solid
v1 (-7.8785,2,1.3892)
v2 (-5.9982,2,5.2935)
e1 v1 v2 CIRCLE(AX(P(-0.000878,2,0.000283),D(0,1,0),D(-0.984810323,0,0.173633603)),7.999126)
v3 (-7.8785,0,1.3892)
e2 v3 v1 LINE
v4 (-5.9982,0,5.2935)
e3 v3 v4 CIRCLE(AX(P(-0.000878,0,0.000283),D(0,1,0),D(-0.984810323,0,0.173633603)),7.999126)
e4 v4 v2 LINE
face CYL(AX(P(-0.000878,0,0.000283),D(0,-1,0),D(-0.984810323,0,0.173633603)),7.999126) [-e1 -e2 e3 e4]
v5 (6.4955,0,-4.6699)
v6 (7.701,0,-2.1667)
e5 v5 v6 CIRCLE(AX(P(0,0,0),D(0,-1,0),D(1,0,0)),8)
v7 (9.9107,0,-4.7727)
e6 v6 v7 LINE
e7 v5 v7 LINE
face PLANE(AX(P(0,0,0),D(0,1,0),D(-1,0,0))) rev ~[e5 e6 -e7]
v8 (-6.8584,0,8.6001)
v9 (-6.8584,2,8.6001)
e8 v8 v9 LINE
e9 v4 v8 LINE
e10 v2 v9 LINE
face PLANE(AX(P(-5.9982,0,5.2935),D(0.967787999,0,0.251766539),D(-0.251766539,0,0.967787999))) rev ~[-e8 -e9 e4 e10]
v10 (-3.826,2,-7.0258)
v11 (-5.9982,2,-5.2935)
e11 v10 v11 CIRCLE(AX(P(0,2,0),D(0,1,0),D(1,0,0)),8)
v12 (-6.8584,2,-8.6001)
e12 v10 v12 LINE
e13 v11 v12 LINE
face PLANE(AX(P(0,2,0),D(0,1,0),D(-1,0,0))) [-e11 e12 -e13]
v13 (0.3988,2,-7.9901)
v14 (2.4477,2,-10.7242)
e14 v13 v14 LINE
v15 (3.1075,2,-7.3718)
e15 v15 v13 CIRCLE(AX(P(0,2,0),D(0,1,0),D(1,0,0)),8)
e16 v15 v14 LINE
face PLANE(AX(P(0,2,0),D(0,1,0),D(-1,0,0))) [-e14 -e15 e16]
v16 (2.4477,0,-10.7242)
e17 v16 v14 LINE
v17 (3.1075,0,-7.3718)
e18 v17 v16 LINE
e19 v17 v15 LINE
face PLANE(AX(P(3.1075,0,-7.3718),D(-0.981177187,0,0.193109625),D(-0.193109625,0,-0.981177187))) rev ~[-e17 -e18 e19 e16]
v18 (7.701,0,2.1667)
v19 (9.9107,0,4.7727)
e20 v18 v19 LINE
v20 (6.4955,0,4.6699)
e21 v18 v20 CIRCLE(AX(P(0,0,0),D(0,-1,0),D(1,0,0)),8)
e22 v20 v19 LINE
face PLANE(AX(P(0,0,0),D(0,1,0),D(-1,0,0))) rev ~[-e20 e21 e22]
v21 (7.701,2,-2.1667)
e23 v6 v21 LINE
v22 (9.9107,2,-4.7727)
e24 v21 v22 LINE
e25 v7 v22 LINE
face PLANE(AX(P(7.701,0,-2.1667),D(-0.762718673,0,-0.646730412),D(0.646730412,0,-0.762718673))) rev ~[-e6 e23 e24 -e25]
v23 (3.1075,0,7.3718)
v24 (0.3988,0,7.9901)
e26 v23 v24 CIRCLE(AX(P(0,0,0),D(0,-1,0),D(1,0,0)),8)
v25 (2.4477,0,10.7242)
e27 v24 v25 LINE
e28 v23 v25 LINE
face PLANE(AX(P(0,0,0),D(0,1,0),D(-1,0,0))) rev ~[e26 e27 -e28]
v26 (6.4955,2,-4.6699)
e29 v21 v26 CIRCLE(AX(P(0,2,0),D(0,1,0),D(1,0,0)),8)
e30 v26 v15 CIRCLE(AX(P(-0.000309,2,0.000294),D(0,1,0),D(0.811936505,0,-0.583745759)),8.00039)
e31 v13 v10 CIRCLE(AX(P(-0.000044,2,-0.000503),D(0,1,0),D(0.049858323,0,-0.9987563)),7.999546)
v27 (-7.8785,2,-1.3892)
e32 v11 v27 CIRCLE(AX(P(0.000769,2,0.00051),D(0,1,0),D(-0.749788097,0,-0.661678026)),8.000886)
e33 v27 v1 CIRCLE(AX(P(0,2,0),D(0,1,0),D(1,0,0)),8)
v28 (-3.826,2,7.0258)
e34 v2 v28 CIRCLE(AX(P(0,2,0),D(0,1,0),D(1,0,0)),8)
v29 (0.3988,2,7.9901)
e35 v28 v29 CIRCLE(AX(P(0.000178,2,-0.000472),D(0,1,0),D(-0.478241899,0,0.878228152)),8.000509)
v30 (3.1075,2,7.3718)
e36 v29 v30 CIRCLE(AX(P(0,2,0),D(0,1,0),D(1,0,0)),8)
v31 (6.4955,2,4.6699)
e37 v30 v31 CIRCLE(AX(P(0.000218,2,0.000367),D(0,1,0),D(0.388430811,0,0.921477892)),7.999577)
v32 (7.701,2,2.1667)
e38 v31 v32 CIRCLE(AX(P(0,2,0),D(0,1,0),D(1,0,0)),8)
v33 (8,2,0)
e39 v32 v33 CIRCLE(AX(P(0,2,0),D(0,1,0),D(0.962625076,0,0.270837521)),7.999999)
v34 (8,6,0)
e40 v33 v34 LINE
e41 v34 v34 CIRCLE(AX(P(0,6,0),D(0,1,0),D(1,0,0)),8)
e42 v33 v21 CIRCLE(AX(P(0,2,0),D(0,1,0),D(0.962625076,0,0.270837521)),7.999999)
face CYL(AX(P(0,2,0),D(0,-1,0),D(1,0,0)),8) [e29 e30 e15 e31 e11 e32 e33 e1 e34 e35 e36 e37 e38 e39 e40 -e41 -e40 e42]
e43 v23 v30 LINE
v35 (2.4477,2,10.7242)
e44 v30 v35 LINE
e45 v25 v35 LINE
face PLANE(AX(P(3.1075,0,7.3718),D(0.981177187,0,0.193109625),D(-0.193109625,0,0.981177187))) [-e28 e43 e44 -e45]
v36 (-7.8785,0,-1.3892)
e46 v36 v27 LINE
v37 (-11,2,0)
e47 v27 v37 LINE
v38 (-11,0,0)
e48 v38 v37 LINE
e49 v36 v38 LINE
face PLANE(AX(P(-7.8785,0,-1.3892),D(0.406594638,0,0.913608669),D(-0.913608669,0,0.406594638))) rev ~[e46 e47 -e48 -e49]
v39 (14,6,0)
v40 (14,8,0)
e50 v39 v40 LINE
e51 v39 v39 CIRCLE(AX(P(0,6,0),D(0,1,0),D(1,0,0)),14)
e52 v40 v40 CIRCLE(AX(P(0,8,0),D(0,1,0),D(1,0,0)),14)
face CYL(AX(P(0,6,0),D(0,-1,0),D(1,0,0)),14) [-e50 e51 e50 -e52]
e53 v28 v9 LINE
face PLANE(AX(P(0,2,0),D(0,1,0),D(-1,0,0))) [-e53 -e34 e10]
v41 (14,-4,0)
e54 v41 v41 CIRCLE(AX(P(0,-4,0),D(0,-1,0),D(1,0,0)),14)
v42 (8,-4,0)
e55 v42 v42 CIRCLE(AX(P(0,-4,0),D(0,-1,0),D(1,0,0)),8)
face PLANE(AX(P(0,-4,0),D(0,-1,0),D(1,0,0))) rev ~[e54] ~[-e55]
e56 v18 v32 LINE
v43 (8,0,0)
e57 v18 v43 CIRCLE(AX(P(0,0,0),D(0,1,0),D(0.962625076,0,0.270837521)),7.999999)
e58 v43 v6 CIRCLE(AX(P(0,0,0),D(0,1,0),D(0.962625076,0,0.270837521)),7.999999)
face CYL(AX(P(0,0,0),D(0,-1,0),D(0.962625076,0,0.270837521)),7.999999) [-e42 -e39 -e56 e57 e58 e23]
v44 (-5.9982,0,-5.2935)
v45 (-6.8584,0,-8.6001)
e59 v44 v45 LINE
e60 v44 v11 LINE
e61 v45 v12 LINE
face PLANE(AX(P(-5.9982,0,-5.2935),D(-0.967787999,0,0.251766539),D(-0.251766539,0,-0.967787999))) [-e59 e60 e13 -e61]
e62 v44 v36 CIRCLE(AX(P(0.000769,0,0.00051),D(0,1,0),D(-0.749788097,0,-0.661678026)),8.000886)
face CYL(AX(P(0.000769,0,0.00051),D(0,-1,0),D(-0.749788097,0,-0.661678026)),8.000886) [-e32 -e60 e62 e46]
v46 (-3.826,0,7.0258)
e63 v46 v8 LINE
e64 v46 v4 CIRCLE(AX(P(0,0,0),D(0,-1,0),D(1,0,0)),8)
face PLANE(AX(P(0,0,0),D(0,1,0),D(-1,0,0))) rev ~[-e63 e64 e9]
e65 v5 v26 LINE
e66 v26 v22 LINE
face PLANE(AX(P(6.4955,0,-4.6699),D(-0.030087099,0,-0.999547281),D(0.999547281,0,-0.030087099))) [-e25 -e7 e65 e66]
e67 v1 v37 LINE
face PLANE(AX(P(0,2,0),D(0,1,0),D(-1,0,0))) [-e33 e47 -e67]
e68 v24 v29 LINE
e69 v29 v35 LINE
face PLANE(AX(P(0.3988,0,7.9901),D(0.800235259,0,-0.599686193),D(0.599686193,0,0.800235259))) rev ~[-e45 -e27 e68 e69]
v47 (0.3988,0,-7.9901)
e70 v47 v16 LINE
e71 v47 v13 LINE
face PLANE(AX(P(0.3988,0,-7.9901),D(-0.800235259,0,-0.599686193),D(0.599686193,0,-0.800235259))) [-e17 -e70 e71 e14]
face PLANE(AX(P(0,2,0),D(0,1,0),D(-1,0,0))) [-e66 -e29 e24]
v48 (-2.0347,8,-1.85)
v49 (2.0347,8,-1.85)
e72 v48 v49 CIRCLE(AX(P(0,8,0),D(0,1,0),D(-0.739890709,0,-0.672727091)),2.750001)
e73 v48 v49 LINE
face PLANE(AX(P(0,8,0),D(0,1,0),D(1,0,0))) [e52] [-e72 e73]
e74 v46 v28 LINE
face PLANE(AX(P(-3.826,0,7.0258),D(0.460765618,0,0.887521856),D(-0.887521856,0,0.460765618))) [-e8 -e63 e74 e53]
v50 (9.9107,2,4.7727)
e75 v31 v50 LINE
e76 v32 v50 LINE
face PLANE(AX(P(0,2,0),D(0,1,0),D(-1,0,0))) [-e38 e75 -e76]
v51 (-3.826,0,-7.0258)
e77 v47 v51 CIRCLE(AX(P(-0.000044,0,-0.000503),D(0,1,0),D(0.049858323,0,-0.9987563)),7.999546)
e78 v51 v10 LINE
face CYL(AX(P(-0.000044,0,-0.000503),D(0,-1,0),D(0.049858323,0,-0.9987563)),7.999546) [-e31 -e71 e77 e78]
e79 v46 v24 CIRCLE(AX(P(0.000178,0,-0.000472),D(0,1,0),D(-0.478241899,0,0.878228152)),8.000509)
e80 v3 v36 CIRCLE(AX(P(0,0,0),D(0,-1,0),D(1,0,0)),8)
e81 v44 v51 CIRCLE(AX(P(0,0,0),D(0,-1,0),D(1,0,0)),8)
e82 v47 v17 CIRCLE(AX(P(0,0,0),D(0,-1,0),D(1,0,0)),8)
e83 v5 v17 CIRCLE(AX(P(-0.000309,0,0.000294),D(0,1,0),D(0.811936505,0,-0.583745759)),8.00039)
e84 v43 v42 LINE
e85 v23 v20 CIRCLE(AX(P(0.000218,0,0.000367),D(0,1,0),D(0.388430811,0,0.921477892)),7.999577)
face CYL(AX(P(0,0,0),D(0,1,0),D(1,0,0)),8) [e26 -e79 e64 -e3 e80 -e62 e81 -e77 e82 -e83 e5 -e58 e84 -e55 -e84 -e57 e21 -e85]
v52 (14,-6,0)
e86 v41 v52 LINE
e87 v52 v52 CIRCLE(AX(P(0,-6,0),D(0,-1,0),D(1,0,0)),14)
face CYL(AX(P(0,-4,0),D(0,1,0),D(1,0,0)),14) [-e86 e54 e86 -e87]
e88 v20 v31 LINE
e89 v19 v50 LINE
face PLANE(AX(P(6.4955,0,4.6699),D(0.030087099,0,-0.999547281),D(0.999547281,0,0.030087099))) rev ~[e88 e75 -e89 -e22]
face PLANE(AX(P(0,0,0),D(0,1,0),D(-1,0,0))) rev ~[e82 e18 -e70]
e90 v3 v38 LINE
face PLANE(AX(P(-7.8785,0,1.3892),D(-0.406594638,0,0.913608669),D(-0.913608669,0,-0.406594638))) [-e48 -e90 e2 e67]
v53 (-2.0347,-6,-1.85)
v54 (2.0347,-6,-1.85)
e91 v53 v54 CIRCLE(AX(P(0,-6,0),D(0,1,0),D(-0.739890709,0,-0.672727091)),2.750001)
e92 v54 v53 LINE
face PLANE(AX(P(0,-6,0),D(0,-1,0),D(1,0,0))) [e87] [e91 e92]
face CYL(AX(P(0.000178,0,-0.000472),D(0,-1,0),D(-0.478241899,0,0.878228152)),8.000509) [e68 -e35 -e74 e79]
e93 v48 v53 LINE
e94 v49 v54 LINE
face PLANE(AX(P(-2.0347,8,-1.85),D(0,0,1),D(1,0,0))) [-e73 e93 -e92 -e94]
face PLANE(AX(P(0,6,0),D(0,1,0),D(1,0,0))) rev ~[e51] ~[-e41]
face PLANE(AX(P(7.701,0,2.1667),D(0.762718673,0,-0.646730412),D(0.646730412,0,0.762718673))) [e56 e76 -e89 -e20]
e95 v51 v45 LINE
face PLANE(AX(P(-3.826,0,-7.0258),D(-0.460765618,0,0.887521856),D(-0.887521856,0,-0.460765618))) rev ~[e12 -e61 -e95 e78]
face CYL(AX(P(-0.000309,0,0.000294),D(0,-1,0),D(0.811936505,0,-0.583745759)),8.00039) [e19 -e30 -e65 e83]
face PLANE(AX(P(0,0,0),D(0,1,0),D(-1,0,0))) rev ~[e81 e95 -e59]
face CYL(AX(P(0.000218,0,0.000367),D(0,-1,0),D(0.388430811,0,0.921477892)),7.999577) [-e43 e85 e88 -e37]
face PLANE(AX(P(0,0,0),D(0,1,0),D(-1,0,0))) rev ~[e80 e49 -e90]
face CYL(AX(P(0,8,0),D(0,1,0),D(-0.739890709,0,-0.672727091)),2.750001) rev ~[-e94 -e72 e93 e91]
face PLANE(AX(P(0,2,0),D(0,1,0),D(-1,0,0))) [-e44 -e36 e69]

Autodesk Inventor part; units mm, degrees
ref_plane "YZ Plane" through (0, 0, 0) normal (1, 0, 0) x (0, 1, 0)
ref_plane "XZ Plane" through (0, 0, 0) normal (0, 1, 0) x (-1, 0, 0)
ref_plane "XY Plane" through (0, 0, 0) normal (0, 0, 1) x (1, 0, 0)
sketch "Sketch1" plane through (0, 0, 0) normal (0, 1, 0) x (-1, 0, 0)
  line L0 (0, 0) -> (13.4559, 0) construction
  line L1 (7.8785, 1.3892) -> (11, 0)
  line L2 (7.8785, -1.3892) -> (11, 0)
  line L3 (5.9982, 5.2935) -> (6.8584, 8.6001)
  line L4 (3.826, 7.0258) -> (6.8584, 8.6001)
  line L5 (-0.3988, 7.9901) -> (-2.4477, 10.7242)
  line L6 (-3.1075, 7.3718) -> (-2.4477, 10.7242)
  line L7 (-6.4955, 4.6699) -> (-9.9107, 4.7727)
  line L8 (-7.701, 2.1667) -> (-9.9107, 4.7727)
  line L9 (-7.701, -2.1667) -> (-9.9107, -4.7727)
  line L10 (-6.4955, -4.6699) -> (-9.9107, -4.7727)
  line L11 (-3.1075, -7.3718) -> (-2.4477, -10.7242)
  line L12 (-0.3988, -7.9901) -> (-2.4477, -10.7242)
  line L13 (3.826, -7.0258) -> (6.8584, -8.6001)
  line L14 (5.9982, -5.2935) -> (6.8584, -8.6001)
  arc A0 (7.8785, 1.3892) -> (5.9982, 5.2935) centre (0, 0) ccw
  arc A1 (5.9982, -5.2935) -> (7.8785, -1.3892) centre (0, 0) ccw
  arc A2 (-0.3988, -7.9901) -> (3.826, -7.0258) centre (0, 0) ccw
  arc A3 (-6.4955, -4.6699) -> (-3.1075, -7.3718) centre (0, 0) ccw
  arc A4 (-7.701, 2.1667) -> (-7.701, -2.1667) centre (0, 0) ccw
  arc A5 (3.826, 7.0258) -> (-0.3988, 7.9901) centre (0, 0) ccw
  arc A6 (-3.1075, 7.3718) -> (-6.4955, 4.6699) centre (0, 0) ccw
  dimension "d10" = 360
extrude "Extrusion1" add sketch "Sketch1" along normal blind 2
sketch "Sketch2" plane through (0, 2, 0) normal (0, 1, 0) x (1, 0, 0)
  circle A0 centre (0, 0) radius 8
extrude "Extrusion2" add sketch "Sketch2" along normal blind 4
sketch "Sketch3" plane through (0, 0, 0) normal (0, -1, 0) x (1, 0, 0)
  circle A0 centre (0, 0) radius 8
extrude "Extrusion3" add sketch "Sketch3" along normal blind 4
sketch "Sketch4" plane through (0, 6, 0) normal (0, 1, 0) x (1, 0, 0)
  circle A0 centre (0, 0) radius 14
  dimension "d18" = 28
sketch "Sketch5" plane through (0, -4, 0) normal (0, -1, 0) x (1, 0, 0)
  circle A0 centre (0, 0) radius 14
  dimension "d19" = 28
extrude "Extrusion4" add sketch "Sketch5" along normal blind 2
extrude "Extrusion5" add sketch "Sketch4" along normal blind 2
sketch "Sketch6" plane through (0, 8, 0) normal (0, 1, 0) x (1, 0, 0)
  arc A0 (-2.0347, 1.85) -> (2.0347, 1.85) centre (0, 0) ccw
  line L0 (-2.0347, 1.85) -> (2.0347, 1.85)
  dimension "d24" = 5.5
extrude "Extrusion6" cut sketch "Sketch6" against normal through all
